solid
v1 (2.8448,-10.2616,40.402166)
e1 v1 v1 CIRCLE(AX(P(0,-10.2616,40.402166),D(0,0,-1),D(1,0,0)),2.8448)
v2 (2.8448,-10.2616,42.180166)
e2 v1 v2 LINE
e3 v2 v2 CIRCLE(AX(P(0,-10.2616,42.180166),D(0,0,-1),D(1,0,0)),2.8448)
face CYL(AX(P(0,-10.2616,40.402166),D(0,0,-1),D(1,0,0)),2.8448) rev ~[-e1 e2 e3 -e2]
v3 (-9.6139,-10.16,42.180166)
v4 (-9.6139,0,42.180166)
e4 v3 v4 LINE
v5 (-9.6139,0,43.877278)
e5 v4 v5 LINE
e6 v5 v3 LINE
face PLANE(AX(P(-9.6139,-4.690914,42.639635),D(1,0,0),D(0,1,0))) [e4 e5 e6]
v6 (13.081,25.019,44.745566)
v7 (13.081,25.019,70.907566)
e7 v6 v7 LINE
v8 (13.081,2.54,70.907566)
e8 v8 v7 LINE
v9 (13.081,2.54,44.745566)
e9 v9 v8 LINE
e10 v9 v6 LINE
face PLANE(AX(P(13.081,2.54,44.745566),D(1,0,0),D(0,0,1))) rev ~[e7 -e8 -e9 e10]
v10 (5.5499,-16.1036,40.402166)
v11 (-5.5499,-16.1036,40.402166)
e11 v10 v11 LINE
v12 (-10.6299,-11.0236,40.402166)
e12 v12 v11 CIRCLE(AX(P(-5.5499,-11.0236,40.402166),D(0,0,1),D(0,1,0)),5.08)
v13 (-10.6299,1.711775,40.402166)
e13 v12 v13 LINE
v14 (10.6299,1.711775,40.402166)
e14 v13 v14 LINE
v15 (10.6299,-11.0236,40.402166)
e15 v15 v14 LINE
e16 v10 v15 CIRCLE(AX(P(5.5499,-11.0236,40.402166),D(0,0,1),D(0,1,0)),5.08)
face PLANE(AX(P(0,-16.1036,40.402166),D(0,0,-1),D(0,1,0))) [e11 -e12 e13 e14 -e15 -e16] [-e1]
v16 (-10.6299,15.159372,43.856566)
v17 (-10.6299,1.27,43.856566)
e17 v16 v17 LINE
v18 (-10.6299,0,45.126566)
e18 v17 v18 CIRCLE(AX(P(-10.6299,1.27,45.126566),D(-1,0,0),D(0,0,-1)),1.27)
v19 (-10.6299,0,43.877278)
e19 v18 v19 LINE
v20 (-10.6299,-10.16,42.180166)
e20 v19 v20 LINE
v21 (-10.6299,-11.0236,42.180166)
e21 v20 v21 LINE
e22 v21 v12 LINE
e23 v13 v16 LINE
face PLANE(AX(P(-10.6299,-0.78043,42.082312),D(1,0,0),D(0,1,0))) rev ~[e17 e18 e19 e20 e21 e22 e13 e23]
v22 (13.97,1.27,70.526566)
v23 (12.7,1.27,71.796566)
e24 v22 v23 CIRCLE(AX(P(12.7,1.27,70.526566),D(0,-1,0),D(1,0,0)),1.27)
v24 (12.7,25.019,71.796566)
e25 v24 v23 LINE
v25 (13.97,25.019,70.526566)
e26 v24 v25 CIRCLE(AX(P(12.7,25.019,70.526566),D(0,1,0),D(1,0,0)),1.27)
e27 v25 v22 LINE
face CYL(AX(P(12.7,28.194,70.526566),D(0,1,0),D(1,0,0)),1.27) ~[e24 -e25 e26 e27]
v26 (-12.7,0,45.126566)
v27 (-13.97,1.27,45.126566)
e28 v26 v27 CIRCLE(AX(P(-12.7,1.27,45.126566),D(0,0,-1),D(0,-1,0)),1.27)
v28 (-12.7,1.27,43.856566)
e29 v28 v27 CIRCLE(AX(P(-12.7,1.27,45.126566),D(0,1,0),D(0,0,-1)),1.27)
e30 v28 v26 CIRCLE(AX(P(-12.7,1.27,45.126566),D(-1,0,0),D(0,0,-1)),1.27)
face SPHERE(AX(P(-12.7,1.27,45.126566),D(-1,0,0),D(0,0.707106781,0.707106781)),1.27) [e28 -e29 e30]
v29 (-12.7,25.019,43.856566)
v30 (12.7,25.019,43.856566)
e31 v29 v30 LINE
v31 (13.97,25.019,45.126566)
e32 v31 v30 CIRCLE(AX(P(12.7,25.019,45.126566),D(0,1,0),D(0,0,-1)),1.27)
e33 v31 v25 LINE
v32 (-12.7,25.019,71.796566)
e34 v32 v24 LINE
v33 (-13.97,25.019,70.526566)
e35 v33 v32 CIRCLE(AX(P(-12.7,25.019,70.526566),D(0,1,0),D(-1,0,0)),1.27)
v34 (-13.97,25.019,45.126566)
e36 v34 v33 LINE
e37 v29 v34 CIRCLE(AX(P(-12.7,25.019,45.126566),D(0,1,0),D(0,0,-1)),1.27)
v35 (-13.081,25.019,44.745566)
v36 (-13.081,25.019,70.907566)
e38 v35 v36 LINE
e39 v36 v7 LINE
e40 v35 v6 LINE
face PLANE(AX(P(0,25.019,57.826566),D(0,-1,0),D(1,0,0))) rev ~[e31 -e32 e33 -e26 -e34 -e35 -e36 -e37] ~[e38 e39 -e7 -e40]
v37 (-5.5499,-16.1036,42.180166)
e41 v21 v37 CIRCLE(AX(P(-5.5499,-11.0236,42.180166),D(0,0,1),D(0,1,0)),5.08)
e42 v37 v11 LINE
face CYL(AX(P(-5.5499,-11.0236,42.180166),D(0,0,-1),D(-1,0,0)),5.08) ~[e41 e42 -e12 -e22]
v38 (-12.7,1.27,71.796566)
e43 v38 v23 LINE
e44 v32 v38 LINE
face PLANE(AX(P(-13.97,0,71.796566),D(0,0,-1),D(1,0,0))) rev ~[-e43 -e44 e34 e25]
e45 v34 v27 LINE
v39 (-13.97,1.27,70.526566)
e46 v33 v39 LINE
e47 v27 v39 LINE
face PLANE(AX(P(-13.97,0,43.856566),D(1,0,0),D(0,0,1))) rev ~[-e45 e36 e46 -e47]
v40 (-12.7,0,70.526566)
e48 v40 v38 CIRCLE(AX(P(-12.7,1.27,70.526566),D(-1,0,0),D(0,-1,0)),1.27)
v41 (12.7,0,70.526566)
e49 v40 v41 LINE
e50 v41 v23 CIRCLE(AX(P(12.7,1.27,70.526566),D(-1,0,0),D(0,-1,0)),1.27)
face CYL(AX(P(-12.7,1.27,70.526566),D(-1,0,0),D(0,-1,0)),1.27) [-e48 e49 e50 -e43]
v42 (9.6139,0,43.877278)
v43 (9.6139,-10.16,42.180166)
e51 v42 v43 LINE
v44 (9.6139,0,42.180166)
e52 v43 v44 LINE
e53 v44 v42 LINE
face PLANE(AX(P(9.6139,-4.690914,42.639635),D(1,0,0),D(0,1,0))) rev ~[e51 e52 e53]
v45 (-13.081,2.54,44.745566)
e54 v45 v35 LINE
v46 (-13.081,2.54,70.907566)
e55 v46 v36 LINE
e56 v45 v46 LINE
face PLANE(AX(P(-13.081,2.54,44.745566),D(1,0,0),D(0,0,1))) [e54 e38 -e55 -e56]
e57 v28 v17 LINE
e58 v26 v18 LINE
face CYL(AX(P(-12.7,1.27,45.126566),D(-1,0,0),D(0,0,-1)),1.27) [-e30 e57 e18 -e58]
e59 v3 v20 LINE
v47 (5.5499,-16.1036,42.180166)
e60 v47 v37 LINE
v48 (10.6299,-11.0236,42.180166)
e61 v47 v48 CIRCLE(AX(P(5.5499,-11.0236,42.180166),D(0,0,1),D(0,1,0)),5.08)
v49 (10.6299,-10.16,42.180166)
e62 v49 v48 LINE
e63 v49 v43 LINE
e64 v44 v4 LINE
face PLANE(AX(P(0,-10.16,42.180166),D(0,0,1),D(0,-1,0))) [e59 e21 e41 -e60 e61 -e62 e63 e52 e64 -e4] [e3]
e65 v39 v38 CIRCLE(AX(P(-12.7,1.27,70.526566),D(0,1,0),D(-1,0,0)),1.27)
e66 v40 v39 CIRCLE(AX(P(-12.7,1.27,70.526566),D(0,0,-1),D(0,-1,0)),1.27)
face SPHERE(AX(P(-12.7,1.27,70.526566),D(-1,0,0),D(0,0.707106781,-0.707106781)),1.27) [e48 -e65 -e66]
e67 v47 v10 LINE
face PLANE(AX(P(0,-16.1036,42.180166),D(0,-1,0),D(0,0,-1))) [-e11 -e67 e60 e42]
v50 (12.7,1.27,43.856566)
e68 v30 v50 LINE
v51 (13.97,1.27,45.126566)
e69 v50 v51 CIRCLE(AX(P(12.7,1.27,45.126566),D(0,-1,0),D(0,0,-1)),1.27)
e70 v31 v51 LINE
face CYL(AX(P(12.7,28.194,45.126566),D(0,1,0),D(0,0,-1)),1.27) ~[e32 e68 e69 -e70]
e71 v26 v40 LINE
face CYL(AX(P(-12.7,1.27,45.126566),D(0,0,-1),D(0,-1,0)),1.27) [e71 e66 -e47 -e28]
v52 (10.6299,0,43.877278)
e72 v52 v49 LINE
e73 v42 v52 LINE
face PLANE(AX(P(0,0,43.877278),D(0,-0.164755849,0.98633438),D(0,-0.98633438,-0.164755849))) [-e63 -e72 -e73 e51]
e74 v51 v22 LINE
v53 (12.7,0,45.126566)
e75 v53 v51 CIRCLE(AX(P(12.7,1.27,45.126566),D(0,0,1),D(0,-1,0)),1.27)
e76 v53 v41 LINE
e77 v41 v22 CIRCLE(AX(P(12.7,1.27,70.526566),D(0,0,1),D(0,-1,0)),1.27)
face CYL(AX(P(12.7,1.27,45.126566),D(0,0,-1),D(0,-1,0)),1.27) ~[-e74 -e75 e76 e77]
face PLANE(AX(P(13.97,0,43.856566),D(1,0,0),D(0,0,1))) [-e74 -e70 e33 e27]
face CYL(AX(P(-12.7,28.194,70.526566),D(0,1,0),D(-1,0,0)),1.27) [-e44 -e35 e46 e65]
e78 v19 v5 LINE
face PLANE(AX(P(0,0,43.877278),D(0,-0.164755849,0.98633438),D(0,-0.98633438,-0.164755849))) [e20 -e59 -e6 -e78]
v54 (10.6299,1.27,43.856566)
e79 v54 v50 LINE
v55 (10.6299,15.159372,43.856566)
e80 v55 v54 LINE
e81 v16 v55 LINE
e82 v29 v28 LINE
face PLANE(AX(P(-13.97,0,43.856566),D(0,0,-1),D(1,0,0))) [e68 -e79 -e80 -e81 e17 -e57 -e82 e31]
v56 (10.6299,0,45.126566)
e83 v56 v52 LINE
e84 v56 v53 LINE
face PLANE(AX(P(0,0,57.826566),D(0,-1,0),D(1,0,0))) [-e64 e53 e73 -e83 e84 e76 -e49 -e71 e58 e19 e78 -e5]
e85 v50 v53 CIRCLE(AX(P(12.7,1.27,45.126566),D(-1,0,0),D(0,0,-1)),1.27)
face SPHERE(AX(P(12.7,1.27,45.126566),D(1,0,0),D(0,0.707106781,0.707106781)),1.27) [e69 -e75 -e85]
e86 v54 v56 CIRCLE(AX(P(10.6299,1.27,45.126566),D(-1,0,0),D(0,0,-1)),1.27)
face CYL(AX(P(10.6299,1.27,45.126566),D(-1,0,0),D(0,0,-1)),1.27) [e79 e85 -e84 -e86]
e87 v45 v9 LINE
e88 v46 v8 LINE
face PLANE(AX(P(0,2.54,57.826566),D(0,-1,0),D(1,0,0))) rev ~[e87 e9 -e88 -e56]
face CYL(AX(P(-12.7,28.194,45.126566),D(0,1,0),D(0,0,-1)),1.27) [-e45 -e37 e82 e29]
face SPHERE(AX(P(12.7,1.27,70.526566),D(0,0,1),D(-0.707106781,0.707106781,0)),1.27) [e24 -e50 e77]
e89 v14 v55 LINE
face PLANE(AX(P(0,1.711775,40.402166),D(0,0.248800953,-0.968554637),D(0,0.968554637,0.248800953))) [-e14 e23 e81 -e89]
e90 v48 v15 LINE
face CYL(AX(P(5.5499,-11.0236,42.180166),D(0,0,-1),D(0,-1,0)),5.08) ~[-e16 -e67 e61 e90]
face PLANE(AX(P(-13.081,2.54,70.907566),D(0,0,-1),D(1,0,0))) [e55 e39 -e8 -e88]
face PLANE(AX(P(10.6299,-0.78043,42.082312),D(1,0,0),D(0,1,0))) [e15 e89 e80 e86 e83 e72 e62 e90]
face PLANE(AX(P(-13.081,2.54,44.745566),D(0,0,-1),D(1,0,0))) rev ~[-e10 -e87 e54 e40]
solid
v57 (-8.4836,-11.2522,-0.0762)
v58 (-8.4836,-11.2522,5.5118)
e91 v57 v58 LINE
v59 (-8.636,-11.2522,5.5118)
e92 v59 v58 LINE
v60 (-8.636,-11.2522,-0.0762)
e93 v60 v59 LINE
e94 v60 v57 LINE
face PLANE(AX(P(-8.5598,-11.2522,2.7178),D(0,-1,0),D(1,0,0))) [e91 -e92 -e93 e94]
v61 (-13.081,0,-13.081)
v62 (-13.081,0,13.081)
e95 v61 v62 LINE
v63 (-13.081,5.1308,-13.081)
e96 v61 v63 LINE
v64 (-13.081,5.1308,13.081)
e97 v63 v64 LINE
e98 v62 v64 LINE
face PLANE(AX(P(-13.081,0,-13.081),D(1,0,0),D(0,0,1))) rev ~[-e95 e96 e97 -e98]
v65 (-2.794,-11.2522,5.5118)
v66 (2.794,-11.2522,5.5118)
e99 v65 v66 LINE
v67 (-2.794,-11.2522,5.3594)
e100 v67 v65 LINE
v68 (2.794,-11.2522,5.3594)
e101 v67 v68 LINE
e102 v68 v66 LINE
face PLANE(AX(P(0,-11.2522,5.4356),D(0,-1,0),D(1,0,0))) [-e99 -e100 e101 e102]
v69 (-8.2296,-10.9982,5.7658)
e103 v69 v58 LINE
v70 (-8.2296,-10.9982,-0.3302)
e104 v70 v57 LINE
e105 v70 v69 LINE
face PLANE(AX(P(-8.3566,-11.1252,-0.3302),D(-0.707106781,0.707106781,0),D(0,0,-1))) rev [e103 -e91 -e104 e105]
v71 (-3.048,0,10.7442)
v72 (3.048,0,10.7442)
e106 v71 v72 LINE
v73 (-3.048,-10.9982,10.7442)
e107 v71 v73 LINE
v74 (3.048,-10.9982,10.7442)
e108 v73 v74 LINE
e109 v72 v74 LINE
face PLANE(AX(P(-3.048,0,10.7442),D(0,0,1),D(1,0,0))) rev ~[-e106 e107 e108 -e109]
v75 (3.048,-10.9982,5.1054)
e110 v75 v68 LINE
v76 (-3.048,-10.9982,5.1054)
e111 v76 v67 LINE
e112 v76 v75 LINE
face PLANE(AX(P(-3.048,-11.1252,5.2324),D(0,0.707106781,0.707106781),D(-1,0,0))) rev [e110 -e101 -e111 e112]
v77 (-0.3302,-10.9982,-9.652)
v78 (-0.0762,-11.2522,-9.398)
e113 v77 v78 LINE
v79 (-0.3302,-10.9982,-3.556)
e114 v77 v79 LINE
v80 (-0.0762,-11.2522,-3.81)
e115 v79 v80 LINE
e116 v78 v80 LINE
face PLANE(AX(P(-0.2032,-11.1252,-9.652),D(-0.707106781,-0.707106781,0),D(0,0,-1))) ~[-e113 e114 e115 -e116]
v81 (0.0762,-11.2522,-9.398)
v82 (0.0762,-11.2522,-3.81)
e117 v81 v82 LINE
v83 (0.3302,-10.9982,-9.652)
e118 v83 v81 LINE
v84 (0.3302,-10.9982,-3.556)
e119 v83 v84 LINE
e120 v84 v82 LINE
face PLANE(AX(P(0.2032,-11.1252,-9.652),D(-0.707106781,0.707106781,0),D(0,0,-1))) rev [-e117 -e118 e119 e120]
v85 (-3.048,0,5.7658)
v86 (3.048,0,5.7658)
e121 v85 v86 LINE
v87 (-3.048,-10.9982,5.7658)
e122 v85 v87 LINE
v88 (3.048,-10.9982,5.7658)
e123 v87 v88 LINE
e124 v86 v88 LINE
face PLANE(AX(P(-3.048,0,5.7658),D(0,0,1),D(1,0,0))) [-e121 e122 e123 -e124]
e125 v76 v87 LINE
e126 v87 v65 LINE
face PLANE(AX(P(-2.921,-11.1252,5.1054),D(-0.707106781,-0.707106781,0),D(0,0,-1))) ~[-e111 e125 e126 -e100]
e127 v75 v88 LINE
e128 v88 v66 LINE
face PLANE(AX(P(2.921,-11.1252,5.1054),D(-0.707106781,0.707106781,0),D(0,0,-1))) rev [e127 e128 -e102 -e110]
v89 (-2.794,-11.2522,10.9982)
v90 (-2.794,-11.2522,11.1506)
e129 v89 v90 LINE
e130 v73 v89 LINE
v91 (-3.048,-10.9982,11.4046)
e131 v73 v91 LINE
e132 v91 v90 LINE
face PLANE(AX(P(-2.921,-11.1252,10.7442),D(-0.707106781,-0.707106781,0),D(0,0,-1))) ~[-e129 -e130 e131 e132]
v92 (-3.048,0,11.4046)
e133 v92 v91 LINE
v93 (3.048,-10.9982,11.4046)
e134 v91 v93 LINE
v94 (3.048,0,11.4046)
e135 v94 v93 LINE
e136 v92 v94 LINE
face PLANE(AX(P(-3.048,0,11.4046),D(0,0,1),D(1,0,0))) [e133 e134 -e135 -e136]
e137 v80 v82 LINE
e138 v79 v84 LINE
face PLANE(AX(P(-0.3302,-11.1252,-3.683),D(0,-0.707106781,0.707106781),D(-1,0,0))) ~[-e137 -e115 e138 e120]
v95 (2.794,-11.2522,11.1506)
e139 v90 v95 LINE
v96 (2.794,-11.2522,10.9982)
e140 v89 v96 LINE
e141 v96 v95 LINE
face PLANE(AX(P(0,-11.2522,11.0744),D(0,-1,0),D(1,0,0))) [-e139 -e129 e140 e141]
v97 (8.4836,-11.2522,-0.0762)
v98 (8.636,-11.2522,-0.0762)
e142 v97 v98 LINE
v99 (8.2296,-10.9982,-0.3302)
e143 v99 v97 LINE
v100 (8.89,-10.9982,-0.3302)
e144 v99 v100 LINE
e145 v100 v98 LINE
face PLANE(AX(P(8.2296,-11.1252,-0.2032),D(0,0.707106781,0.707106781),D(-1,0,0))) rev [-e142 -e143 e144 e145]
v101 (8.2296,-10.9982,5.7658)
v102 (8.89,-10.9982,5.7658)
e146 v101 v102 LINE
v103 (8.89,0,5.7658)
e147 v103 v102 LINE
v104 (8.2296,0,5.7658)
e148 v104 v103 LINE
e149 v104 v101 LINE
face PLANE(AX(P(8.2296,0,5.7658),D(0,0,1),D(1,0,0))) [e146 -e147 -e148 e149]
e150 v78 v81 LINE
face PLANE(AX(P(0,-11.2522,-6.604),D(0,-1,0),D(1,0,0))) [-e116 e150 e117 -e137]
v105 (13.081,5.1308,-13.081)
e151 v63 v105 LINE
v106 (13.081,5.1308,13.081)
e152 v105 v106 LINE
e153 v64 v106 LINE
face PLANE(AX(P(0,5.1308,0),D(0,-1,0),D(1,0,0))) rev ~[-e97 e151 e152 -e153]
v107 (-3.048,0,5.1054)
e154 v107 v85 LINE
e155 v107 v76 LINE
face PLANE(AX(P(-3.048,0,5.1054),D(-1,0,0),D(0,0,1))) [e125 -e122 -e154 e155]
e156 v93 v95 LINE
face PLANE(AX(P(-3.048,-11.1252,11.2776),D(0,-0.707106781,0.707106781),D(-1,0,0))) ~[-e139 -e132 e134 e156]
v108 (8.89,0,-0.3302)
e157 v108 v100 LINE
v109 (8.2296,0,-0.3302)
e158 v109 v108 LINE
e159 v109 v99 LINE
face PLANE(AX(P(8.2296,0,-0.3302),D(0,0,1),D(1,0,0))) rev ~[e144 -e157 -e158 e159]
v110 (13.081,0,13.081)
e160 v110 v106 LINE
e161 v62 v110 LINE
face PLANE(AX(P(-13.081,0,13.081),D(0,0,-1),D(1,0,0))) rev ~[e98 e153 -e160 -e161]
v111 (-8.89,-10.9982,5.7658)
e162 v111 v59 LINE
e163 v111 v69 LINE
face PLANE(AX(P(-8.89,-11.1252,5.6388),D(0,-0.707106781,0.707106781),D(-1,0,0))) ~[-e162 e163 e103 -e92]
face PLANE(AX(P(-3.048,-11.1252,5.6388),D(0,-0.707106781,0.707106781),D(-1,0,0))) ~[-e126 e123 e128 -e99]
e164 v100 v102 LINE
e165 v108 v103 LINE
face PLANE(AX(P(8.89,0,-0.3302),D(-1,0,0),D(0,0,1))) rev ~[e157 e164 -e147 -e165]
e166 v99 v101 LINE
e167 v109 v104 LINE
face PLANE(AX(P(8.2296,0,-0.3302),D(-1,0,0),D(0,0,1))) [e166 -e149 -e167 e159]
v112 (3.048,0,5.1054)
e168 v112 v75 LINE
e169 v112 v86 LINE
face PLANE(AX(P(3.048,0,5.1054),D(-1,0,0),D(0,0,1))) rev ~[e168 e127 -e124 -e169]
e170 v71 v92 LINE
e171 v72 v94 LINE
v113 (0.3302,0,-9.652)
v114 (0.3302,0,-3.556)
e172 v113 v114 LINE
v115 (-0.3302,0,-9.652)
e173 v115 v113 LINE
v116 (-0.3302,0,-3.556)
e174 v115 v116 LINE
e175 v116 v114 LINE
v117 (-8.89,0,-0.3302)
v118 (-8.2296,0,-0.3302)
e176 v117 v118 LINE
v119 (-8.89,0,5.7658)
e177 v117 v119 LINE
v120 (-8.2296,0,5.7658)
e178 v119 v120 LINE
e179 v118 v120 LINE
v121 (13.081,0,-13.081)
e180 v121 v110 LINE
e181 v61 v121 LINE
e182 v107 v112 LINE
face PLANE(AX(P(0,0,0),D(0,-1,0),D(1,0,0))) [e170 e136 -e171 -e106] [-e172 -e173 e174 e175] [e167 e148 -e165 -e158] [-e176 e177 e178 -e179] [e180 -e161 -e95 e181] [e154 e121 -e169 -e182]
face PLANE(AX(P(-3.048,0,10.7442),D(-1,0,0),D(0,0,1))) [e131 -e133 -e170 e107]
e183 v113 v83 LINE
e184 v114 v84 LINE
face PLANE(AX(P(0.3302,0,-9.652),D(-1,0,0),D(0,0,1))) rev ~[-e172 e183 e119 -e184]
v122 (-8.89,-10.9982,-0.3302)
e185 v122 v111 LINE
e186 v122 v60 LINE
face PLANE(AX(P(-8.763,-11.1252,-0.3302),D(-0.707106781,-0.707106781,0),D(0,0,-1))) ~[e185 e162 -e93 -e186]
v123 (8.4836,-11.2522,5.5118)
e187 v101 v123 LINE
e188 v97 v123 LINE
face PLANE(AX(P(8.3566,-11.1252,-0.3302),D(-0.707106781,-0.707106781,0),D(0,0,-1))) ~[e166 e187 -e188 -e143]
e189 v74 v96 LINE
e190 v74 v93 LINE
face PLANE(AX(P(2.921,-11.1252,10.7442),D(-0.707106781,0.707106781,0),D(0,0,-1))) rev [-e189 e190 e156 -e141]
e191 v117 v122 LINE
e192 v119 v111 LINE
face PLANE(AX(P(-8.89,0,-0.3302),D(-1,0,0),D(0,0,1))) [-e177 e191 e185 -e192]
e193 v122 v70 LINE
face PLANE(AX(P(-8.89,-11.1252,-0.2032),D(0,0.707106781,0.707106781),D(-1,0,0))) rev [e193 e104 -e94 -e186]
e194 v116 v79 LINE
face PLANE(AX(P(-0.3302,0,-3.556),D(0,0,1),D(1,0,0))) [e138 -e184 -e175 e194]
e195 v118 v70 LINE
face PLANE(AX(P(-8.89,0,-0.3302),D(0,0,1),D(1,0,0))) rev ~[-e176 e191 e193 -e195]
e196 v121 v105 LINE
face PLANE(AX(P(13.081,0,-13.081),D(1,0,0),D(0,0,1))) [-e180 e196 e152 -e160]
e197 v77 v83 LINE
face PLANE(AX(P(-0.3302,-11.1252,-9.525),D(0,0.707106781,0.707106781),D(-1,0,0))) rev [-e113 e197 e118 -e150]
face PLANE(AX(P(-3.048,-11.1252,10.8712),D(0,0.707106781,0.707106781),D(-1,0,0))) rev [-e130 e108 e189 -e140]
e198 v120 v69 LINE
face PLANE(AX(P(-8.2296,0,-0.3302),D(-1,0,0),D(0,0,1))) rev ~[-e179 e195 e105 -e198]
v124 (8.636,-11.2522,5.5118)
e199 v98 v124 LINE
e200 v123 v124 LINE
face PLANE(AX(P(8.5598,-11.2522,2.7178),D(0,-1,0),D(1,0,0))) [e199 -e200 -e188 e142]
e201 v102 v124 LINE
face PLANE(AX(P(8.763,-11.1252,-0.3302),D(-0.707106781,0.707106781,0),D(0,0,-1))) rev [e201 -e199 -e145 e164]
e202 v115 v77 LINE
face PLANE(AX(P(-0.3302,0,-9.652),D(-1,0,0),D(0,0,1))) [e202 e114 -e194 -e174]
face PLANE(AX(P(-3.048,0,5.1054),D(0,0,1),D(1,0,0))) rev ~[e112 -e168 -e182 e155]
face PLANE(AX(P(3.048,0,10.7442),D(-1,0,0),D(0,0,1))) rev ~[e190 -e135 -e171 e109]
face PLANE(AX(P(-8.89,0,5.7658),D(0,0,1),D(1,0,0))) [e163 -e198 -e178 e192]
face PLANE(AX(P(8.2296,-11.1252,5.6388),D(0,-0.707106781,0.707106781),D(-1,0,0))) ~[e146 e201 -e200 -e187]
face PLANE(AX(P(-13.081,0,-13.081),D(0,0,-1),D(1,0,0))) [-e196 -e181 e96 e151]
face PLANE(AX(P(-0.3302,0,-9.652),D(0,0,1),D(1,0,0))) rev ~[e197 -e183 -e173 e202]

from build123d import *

# Parameters (mm, degrees)
F0_W          = 26.162
F0_H          = 26.162
F0_W_2        = 0.6604
F0_H_2        = 6.096
F0_W_3        = 6.096
F0_H_3        = 0.6604
F1_DEPTH      = 5.1308
F2_DEPTH      = 11.2522
F3_SIZE       = 0.254
F4_W          = 27.94
F4_H          = 27.94
F4_W_2        = 26.162
F4_H_2        = 26.162
F5_DEPTH      = 25.019
F6_START      = -2.54
F6_DEPTH      = 25.4
F8_DEPTH      = 10.6299
F9_DEPTH      = 9.6139
F10_R         = 2.8448
F11_DEPTH     = 1.778
F12_R         = 5.08
F13_T1_DEPTH  = 25.4
F13_T3_DEPTH  = 26.924
F13_T5_DEPTH  = 25.4
F13_T7_DEPTH  = 2.0701
F13_T9_DEPTH  = 2.0701
F13_S13_W     = 1.2954
F13_S13_H     = 1.2954
F13_T14_DEPTH = 1.2954
F13_S19_W     = 1.2954
F13_S19_H     = 1.2954
F13_T20_DEPTH = 1.2954
F13_S25_W     = 1.2954
F13_S25_H     = 1.2954
F13_T26_DEPTH = 1.2954
F13_S31_W     = 1.2954
F13_S31_H     = 1.2954
F13_T32_DEPTH = 1.2954


# Not quite as in the source:
# - a fillet or chamfer that OpenCascade refuses, or shapes differently, is made with other operations: its cross-section is extruded or revolved along the edge and cut away or added


with BuildPart() as f1:
    # F0 (on Front) → F1 (new body)
    with BuildSketch(Plane.XZ):
        Rectangle(F0_W, F0_H)
        with Locations((0, -6.604)):
            Rectangle(F0_W_2, F0_H_2, mode=Mode.SUBTRACT)
        with Locations((-8.5598, 2.7178)):
            Rectangle(F0_W_2, F0_H_2, mode=Mode.SUBTRACT)
        with Locations((0, 5.4356)):
            Rectangle(F0_W_3, F0_H_3, mode=Mode.SUBTRACT)
        with Locations((8.5598, 2.7178)):
            Rectangle(F0_W_2, F0_H_2, mode=Mode.SUBTRACT)
        with Locations((0, 11.0744)):
            Rectangle(F0_W_3, F0_H_3, mode=Mode.SUBTRACT)
        with Locations((0, 11.0744)):
            Rectangle(F0_W_3, F0_H_3)
        with Locations((0, 5.4356)):
            Rectangle(F0_W_3, F0_H_3)
        with Locations((-8.5598, 2.7178)):
            Rectangle(F0_W_2, F0_H_2)
        with Locations((8.5598, 2.7178)):
            Rectangle(F0_W_2, F0_H_2)
        with Locations((0, -6.604)):
            Rectangle(F0_W_2, F0_H_2)
    extrude(amount=-F1_DEPTH)

    # F0 (on Front) → F2 (join)
    with BuildSketch(Plane.XZ):
        with Locations((0, 11.0744)):
            Rectangle(F0_W_3, F0_H_3)
        with Locations((0, 5.4356)):
            Rectangle(F0_W_3, F0_H_3)
        with Locations((-8.5598, 2.7178)):
            Rectangle(F0_W_2, F0_H_2)
        with Locations((8.5598, 2.7178)):
            Rectangle(F0_W_2, F0_H_2)
        with Locations((0, -6.604)):
            Rectangle(F0_W_2, F0_H_2)
    extrude(amount=F2_DEPTH)

    # F3
    f3_edges = [f1.edges().sort_by_distance(p)[0] for p in [
        (0, -11.2522, 5.7658),
        (0, -11.2522, 5.1054),
        (-3.048, -11.2522, 5.4356),
        (3.048, -11.2522, 5.4356),
        (0, -11.2522, 11.4046),
        (0, -11.2522, 10.7442),
        (-3.048, -11.2522, 11.0744),
        (3.048, -11.2522, 11.0744),
        (8.5598, -11.2522, 5.7658),
        (8.89, -11.2522, 2.7178),
        (8.2296, -11.2522, 2.7178),
        (8.5598, -11.2522, -0.3302),
        (-8.5598, -11.2522, 5.7658),
        (-8.2296, -11.2522, 2.7178),
        (-8.89, -11.2522, 2.7178),
        (-8.5598, -11.2522, -0.3302),
        (0, -11.2522, -3.556),
        (0.3302, -11.2522, -6.604),
        (-0.3302, -11.2522, -6.604),
        (0, -11.2522, -9.652),
    ]]
    chamfer(f3_edges, length=F3_SIZE)


with BuildPart() as f5:
    # F4 (on Front) → F5 (new body)
    with BuildSketch(Plane.XZ):
        with Locations((0, 57.826566013)):
            Rectangle(F4_W, F4_H)
        with Locations((0, 57.826566013)):
            Rectangle(F4_W_2, F4_H_2, mode=Mode.SUBTRACT)
        with Locations((0, 57.826566013)):
            Rectangle(F4_W_2, F4_H_2)
    extrude(amount=-F5_DEPTH)

    # F4 (on Front) → F6 (cut)
    with BuildSketch(Plane.XZ.offset(F6_START)):
        with Locations((0, 57.826566013)):
            Rectangle(F4_W_2, F4_H_2)
    extrude(amount=-F6_DEPTH, mode=Mode.SUBTRACT)

    # F7 (on Right) → F8 (join, symmetric)
    with BuildSketch(Plane.YZ):
        Polygon((-16.1036, 40.402166013), (1.7117746174, 40.402166013), (15.24, 43.8772775233), (0, 43.8772775233), (0, 42.180166013), (-10.16, 42.180166013), (-16.1036, 42.180166013), align=None)
        Polygon((0, 42.180166013), (0, 43.8772775233), (-10.16, 42.180166013), align=None)
    extrude(amount=F8_DEPTH, both=True)

    # F7 (on Right) → F9 (cut, symmetric)
    with BuildSketch(Plane.YZ):
        Polygon((0, 42.180166013), (0, 43.8772775233), (-10.16, 42.180166013), align=None)
    extrude(amount=F9_DEPTH, both=True, mode=Mode.SUBTRACT)

    # F10 (on face) → F11 (cut, through all)
    with BuildSketch(Plane(origin=(0, 0, 40.402166013), x_dir=(1, 0, 0), z_dir=(0, 0, -1))):
        with Locations((0, 10.2616)):
            Circle(F10_R)
    extrude(amount=-F11_DEPTH, mode=Mode.SUBTRACT)

    # F12
    f12_edges = [f5.edges().sort_by_distance(p)[0] for p in [
        (-10.6299, -16.1036, 41.291166),
        (10.6299, -16.1036, 41.291166),
    ]]
    fillet(f12_edges, radius=F12_R)

    # F13: fillet of radius 1.27 on 9 edges, made by hand

    # F13_s2 → F13_t1 (cut)
    with BuildSketch(Plane.XY.offset(45.126566013)):
        with BuildLine():
            ThreePointArc((12.7, 0), (13.5980256121, 0.3719743879), (13.97, 1.27))
            Line((13.97, 1.27), (13.97, 0))
            Line((13.97, 0), (12.7, 0))
        make_face()
        with BuildLine():
            ThreePointArc((-12.7, 0), (-13.5980256121, 0.3719743879), (-13.97, 1.27))
            Line((-13.97, 1.27), (-13.97, 0))
            Line((-13.97, 0), (-12.7, 0))
        make_face()
    extrude(amount=F13_T1_DEPTH, mode=Mode.SUBTRACT)

    # F13_s4 → F13_t3 (cut)
    with BuildSketch(Plane.XZ.offset(-28.194)):
        with BuildLine():
            ThreePointArc((13.97, 70.526566013), (13.5980256121, 71.4245916251), (12.7, 71.796566013))
            Line((12.7, 71.796566013), (13.97, 71.796566013))
            Line((13.97, 71.796566013), (13.97, 70.526566013))
        make_face()
        with BuildLine():
            ThreePointArc((-13.97, 70.526566013), (-13.5980256121, 71.4245916251), (-12.7, 71.796566013))
            Line((-12.7, 71.796566013), (-13.97, 71.796566013))
            Line((-13.97, 71.796566013), (-13.97, 70.526566013))
        make_face()
        with BuildLine():
            ThreePointArc((-12.7, 43.856566013), (-13.5980256121, 44.2285404009), (-13.97, 45.126566013))
            Line((-13.97, 45.126566013), (-13.97, 43.856566013))
            Line((-13.97, 43.856566013), (-12.7, 43.856566013))
        make_face()
        with BuildLine():
            ThreePointArc((12.7, 43.856566013), (13.5980256121, 44.2285404009), (13.97, 45.126566013))
            Line((13.97, 45.126566013), (13.97, 43.856566013))
            Line((13.97, 43.856566013), (12.7, 43.856566013))
        make_face()
    extrude(amount=F13_T3_DEPTH, mode=Mode.SUBTRACT)

    # F13_s6 → F13_t5 (cut)
    with BuildSketch(Plane.YZ.offset(-12.7)):
        with BuildLine():
            ThreePointArc((0, 70.526566013), (0.3719743879, 71.4245916251), (1.27, 71.796566013))
            Line((1.27, 71.796566013), (0, 71.796566013))
            Line((0, 71.796566013), (0, 70.526566013))
        make_face()
    extrude(amount=F13_T5_DEPTH, mode=Mode.SUBTRACT)

    # F13_s8 → F13_t7 (cut)
    with BuildSketch(Plane.YZ.offset(-12.7)):
        with BuildLine():
            ThreePointArc((1.27, 43.856566013), (0.3719743879, 44.2285404009), (0, 45.126566013))
            Line((0, 45.126566013), (0, 43.856566013))
            Line((0, 43.856566013), (1.27, 43.856566013))
        make_face()
    extrude(amount=F13_T7_DEPTH, mode=Mode.SUBTRACT)

    # F13_s10 → F13_t9 (cut)
    with BuildSketch(Plane.YZ.offset(10.6299)):
        with BuildLine():
            ThreePointArc((1.27, 43.856566013), (0.3719743879, 44.2285404009), (0, 45.126566013))
            Line((0, 45.126566013), (0, 43.856566013))
            Line((0, 43.856566013), (1.27, 43.856566013))
        make_face()
    extrude(amount=F13_T9_DEPTH, mode=Mode.SUBTRACT)


with BuildPart() as f13_tool12:
    # F13_s13 → F13_t14 (new body)
    with BuildSketch(Plane.YZ.offset(12.7)):
        with Locations((0.6223, 44.478866013)):
            Rectangle(F13_S13_W, F13_S13_H)
    extrude(amount=F13_T14_DEPTH)

    # F13_s15 → F13_t16 (revolve, cut)
    with BuildSketch(Plane(origin=(12.7, 1.27, 45.126566013), x_dir=(0, 0.7071067812, 0.7071067812), z_dir=(0, 0.7071067812, -0.7071067812))):
        with BuildLine():
            ThreePointArc((0, -1.27), (1.27, 0), (0, 1.27))
            Line((0, 1.27), (0, -1.27))
        make_face()
    revolve(axis=Axis((12.7, 1.27, 45.126566013), (1, 0, 0)), mode=Mode.SUBTRACT)


with BuildPart() as f5_1:
    add(f5.part)

    # F13_t11: cut F13_tool12
    add(f13_tool12.part, mode=Mode.SUBTRACT)


with BuildPart() as f13_tool18:
    # F13_s19 → F13_t20 (new body)
    with BuildSketch(Plane.XY.offset(70.526566013)):
        with Locations((13.3477, 0.6223)):
            Rectangle(F13_S19_W, F13_S19_H)
    extrude(amount=F13_T20_DEPTH)

    # F13_s21 → F13_t22 (revolve, cut)
    with BuildSketch(Plane(origin=(12.7, 1.27, 70.526566013), x_dir=(-0.7071067812, 0.7071067812, 0), z_dir=(0.7071067812, 0.7071067812, 0))):
        with BuildLine():
            ThreePointArc((0, -1.27), (1.27, 0), (0, 1.27))
            Line((0, 1.27), (0, -1.27))
        make_face()
    revolve(axis=Axis((12.7, 1.27, 70.526566013), (0, 0, 1)), mode=Mode.SUBTRACT)


with BuildPart() as f5_2:
    add(f5_1.part)

    # F13_t17: cut F13_tool18
    add(f13_tool18.part, mode=Mode.SUBTRACT)


with BuildPart() as f13_tool24:
    # F13_s25 → F13_t26 (new body)
    with BuildSketch(Plane.YZ.offset(-12.7)):
        with Locations((0.6223, 71.174266013)):
            Rectangle(F13_S25_W, F13_S25_H)
    extrude(amount=-F13_T26_DEPTH)

    # F13_s27 → F13_t28 (revolve, cut)
    with BuildSketch(Plane(origin=(-12.7, 1.27, 70.526566013), x_dir=(0, 0.7071067812, -0.7071067812), z_dir=(0, 0.7071067812, 0.7071067812))):
        with BuildLine():
            ThreePointArc((0, -1.27), (1.27, 0), (0, 1.27))
            Line((0, 1.27), (0, -1.27))
        make_face()
    revolve(axis=Axis((-12.7, 1.27, 70.526566013), (-1, 0, 0)), mode=Mode.SUBTRACT)


with BuildPart() as f5_3:
    add(f5_2.part)

    # F13_t23: cut F13_tool24
    add(f13_tool24.part, mode=Mode.SUBTRACT)


with BuildPart() as f13_tool30:
    # F13_s31 → F13_t32 (new body)
    with BuildSketch(Plane.YZ.offset(-12.7)):
        with Locations((0.6223, 44.478866013)):
            Rectangle(F13_S31_W, F13_S31_H)
    extrude(amount=-F13_T32_DEPTH)

    # F13_s33 → F13_t34 (revolve, cut)
    with BuildSketch(Plane(origin=(-12.7, 1.27, 45.126566013), x_dir=(0, 0.7071067812, 0.7071067812), z_dir=(0, -0.7071067812, 0.7071067812))):
        with BuildLine():
            ThreePointArc((0, -1.27), (1.27, 0), (0, 1.27))
            Line((0, 1.27), (0, -1.27))
        make_face()
    revolve(axis=Axis((-12.7, 1.27, 45.126566013), (-1, 0, 0)), mode=Mode.SUBTRACT)


with BuildPart() as f5_4:
    add(f5_3.part)

    # F13_t29: cut F13_tool30
    add(f13_tool30.part, mode=Mode.SUBTRACT)


solid = Compound([f1.part, f5_4.part])
